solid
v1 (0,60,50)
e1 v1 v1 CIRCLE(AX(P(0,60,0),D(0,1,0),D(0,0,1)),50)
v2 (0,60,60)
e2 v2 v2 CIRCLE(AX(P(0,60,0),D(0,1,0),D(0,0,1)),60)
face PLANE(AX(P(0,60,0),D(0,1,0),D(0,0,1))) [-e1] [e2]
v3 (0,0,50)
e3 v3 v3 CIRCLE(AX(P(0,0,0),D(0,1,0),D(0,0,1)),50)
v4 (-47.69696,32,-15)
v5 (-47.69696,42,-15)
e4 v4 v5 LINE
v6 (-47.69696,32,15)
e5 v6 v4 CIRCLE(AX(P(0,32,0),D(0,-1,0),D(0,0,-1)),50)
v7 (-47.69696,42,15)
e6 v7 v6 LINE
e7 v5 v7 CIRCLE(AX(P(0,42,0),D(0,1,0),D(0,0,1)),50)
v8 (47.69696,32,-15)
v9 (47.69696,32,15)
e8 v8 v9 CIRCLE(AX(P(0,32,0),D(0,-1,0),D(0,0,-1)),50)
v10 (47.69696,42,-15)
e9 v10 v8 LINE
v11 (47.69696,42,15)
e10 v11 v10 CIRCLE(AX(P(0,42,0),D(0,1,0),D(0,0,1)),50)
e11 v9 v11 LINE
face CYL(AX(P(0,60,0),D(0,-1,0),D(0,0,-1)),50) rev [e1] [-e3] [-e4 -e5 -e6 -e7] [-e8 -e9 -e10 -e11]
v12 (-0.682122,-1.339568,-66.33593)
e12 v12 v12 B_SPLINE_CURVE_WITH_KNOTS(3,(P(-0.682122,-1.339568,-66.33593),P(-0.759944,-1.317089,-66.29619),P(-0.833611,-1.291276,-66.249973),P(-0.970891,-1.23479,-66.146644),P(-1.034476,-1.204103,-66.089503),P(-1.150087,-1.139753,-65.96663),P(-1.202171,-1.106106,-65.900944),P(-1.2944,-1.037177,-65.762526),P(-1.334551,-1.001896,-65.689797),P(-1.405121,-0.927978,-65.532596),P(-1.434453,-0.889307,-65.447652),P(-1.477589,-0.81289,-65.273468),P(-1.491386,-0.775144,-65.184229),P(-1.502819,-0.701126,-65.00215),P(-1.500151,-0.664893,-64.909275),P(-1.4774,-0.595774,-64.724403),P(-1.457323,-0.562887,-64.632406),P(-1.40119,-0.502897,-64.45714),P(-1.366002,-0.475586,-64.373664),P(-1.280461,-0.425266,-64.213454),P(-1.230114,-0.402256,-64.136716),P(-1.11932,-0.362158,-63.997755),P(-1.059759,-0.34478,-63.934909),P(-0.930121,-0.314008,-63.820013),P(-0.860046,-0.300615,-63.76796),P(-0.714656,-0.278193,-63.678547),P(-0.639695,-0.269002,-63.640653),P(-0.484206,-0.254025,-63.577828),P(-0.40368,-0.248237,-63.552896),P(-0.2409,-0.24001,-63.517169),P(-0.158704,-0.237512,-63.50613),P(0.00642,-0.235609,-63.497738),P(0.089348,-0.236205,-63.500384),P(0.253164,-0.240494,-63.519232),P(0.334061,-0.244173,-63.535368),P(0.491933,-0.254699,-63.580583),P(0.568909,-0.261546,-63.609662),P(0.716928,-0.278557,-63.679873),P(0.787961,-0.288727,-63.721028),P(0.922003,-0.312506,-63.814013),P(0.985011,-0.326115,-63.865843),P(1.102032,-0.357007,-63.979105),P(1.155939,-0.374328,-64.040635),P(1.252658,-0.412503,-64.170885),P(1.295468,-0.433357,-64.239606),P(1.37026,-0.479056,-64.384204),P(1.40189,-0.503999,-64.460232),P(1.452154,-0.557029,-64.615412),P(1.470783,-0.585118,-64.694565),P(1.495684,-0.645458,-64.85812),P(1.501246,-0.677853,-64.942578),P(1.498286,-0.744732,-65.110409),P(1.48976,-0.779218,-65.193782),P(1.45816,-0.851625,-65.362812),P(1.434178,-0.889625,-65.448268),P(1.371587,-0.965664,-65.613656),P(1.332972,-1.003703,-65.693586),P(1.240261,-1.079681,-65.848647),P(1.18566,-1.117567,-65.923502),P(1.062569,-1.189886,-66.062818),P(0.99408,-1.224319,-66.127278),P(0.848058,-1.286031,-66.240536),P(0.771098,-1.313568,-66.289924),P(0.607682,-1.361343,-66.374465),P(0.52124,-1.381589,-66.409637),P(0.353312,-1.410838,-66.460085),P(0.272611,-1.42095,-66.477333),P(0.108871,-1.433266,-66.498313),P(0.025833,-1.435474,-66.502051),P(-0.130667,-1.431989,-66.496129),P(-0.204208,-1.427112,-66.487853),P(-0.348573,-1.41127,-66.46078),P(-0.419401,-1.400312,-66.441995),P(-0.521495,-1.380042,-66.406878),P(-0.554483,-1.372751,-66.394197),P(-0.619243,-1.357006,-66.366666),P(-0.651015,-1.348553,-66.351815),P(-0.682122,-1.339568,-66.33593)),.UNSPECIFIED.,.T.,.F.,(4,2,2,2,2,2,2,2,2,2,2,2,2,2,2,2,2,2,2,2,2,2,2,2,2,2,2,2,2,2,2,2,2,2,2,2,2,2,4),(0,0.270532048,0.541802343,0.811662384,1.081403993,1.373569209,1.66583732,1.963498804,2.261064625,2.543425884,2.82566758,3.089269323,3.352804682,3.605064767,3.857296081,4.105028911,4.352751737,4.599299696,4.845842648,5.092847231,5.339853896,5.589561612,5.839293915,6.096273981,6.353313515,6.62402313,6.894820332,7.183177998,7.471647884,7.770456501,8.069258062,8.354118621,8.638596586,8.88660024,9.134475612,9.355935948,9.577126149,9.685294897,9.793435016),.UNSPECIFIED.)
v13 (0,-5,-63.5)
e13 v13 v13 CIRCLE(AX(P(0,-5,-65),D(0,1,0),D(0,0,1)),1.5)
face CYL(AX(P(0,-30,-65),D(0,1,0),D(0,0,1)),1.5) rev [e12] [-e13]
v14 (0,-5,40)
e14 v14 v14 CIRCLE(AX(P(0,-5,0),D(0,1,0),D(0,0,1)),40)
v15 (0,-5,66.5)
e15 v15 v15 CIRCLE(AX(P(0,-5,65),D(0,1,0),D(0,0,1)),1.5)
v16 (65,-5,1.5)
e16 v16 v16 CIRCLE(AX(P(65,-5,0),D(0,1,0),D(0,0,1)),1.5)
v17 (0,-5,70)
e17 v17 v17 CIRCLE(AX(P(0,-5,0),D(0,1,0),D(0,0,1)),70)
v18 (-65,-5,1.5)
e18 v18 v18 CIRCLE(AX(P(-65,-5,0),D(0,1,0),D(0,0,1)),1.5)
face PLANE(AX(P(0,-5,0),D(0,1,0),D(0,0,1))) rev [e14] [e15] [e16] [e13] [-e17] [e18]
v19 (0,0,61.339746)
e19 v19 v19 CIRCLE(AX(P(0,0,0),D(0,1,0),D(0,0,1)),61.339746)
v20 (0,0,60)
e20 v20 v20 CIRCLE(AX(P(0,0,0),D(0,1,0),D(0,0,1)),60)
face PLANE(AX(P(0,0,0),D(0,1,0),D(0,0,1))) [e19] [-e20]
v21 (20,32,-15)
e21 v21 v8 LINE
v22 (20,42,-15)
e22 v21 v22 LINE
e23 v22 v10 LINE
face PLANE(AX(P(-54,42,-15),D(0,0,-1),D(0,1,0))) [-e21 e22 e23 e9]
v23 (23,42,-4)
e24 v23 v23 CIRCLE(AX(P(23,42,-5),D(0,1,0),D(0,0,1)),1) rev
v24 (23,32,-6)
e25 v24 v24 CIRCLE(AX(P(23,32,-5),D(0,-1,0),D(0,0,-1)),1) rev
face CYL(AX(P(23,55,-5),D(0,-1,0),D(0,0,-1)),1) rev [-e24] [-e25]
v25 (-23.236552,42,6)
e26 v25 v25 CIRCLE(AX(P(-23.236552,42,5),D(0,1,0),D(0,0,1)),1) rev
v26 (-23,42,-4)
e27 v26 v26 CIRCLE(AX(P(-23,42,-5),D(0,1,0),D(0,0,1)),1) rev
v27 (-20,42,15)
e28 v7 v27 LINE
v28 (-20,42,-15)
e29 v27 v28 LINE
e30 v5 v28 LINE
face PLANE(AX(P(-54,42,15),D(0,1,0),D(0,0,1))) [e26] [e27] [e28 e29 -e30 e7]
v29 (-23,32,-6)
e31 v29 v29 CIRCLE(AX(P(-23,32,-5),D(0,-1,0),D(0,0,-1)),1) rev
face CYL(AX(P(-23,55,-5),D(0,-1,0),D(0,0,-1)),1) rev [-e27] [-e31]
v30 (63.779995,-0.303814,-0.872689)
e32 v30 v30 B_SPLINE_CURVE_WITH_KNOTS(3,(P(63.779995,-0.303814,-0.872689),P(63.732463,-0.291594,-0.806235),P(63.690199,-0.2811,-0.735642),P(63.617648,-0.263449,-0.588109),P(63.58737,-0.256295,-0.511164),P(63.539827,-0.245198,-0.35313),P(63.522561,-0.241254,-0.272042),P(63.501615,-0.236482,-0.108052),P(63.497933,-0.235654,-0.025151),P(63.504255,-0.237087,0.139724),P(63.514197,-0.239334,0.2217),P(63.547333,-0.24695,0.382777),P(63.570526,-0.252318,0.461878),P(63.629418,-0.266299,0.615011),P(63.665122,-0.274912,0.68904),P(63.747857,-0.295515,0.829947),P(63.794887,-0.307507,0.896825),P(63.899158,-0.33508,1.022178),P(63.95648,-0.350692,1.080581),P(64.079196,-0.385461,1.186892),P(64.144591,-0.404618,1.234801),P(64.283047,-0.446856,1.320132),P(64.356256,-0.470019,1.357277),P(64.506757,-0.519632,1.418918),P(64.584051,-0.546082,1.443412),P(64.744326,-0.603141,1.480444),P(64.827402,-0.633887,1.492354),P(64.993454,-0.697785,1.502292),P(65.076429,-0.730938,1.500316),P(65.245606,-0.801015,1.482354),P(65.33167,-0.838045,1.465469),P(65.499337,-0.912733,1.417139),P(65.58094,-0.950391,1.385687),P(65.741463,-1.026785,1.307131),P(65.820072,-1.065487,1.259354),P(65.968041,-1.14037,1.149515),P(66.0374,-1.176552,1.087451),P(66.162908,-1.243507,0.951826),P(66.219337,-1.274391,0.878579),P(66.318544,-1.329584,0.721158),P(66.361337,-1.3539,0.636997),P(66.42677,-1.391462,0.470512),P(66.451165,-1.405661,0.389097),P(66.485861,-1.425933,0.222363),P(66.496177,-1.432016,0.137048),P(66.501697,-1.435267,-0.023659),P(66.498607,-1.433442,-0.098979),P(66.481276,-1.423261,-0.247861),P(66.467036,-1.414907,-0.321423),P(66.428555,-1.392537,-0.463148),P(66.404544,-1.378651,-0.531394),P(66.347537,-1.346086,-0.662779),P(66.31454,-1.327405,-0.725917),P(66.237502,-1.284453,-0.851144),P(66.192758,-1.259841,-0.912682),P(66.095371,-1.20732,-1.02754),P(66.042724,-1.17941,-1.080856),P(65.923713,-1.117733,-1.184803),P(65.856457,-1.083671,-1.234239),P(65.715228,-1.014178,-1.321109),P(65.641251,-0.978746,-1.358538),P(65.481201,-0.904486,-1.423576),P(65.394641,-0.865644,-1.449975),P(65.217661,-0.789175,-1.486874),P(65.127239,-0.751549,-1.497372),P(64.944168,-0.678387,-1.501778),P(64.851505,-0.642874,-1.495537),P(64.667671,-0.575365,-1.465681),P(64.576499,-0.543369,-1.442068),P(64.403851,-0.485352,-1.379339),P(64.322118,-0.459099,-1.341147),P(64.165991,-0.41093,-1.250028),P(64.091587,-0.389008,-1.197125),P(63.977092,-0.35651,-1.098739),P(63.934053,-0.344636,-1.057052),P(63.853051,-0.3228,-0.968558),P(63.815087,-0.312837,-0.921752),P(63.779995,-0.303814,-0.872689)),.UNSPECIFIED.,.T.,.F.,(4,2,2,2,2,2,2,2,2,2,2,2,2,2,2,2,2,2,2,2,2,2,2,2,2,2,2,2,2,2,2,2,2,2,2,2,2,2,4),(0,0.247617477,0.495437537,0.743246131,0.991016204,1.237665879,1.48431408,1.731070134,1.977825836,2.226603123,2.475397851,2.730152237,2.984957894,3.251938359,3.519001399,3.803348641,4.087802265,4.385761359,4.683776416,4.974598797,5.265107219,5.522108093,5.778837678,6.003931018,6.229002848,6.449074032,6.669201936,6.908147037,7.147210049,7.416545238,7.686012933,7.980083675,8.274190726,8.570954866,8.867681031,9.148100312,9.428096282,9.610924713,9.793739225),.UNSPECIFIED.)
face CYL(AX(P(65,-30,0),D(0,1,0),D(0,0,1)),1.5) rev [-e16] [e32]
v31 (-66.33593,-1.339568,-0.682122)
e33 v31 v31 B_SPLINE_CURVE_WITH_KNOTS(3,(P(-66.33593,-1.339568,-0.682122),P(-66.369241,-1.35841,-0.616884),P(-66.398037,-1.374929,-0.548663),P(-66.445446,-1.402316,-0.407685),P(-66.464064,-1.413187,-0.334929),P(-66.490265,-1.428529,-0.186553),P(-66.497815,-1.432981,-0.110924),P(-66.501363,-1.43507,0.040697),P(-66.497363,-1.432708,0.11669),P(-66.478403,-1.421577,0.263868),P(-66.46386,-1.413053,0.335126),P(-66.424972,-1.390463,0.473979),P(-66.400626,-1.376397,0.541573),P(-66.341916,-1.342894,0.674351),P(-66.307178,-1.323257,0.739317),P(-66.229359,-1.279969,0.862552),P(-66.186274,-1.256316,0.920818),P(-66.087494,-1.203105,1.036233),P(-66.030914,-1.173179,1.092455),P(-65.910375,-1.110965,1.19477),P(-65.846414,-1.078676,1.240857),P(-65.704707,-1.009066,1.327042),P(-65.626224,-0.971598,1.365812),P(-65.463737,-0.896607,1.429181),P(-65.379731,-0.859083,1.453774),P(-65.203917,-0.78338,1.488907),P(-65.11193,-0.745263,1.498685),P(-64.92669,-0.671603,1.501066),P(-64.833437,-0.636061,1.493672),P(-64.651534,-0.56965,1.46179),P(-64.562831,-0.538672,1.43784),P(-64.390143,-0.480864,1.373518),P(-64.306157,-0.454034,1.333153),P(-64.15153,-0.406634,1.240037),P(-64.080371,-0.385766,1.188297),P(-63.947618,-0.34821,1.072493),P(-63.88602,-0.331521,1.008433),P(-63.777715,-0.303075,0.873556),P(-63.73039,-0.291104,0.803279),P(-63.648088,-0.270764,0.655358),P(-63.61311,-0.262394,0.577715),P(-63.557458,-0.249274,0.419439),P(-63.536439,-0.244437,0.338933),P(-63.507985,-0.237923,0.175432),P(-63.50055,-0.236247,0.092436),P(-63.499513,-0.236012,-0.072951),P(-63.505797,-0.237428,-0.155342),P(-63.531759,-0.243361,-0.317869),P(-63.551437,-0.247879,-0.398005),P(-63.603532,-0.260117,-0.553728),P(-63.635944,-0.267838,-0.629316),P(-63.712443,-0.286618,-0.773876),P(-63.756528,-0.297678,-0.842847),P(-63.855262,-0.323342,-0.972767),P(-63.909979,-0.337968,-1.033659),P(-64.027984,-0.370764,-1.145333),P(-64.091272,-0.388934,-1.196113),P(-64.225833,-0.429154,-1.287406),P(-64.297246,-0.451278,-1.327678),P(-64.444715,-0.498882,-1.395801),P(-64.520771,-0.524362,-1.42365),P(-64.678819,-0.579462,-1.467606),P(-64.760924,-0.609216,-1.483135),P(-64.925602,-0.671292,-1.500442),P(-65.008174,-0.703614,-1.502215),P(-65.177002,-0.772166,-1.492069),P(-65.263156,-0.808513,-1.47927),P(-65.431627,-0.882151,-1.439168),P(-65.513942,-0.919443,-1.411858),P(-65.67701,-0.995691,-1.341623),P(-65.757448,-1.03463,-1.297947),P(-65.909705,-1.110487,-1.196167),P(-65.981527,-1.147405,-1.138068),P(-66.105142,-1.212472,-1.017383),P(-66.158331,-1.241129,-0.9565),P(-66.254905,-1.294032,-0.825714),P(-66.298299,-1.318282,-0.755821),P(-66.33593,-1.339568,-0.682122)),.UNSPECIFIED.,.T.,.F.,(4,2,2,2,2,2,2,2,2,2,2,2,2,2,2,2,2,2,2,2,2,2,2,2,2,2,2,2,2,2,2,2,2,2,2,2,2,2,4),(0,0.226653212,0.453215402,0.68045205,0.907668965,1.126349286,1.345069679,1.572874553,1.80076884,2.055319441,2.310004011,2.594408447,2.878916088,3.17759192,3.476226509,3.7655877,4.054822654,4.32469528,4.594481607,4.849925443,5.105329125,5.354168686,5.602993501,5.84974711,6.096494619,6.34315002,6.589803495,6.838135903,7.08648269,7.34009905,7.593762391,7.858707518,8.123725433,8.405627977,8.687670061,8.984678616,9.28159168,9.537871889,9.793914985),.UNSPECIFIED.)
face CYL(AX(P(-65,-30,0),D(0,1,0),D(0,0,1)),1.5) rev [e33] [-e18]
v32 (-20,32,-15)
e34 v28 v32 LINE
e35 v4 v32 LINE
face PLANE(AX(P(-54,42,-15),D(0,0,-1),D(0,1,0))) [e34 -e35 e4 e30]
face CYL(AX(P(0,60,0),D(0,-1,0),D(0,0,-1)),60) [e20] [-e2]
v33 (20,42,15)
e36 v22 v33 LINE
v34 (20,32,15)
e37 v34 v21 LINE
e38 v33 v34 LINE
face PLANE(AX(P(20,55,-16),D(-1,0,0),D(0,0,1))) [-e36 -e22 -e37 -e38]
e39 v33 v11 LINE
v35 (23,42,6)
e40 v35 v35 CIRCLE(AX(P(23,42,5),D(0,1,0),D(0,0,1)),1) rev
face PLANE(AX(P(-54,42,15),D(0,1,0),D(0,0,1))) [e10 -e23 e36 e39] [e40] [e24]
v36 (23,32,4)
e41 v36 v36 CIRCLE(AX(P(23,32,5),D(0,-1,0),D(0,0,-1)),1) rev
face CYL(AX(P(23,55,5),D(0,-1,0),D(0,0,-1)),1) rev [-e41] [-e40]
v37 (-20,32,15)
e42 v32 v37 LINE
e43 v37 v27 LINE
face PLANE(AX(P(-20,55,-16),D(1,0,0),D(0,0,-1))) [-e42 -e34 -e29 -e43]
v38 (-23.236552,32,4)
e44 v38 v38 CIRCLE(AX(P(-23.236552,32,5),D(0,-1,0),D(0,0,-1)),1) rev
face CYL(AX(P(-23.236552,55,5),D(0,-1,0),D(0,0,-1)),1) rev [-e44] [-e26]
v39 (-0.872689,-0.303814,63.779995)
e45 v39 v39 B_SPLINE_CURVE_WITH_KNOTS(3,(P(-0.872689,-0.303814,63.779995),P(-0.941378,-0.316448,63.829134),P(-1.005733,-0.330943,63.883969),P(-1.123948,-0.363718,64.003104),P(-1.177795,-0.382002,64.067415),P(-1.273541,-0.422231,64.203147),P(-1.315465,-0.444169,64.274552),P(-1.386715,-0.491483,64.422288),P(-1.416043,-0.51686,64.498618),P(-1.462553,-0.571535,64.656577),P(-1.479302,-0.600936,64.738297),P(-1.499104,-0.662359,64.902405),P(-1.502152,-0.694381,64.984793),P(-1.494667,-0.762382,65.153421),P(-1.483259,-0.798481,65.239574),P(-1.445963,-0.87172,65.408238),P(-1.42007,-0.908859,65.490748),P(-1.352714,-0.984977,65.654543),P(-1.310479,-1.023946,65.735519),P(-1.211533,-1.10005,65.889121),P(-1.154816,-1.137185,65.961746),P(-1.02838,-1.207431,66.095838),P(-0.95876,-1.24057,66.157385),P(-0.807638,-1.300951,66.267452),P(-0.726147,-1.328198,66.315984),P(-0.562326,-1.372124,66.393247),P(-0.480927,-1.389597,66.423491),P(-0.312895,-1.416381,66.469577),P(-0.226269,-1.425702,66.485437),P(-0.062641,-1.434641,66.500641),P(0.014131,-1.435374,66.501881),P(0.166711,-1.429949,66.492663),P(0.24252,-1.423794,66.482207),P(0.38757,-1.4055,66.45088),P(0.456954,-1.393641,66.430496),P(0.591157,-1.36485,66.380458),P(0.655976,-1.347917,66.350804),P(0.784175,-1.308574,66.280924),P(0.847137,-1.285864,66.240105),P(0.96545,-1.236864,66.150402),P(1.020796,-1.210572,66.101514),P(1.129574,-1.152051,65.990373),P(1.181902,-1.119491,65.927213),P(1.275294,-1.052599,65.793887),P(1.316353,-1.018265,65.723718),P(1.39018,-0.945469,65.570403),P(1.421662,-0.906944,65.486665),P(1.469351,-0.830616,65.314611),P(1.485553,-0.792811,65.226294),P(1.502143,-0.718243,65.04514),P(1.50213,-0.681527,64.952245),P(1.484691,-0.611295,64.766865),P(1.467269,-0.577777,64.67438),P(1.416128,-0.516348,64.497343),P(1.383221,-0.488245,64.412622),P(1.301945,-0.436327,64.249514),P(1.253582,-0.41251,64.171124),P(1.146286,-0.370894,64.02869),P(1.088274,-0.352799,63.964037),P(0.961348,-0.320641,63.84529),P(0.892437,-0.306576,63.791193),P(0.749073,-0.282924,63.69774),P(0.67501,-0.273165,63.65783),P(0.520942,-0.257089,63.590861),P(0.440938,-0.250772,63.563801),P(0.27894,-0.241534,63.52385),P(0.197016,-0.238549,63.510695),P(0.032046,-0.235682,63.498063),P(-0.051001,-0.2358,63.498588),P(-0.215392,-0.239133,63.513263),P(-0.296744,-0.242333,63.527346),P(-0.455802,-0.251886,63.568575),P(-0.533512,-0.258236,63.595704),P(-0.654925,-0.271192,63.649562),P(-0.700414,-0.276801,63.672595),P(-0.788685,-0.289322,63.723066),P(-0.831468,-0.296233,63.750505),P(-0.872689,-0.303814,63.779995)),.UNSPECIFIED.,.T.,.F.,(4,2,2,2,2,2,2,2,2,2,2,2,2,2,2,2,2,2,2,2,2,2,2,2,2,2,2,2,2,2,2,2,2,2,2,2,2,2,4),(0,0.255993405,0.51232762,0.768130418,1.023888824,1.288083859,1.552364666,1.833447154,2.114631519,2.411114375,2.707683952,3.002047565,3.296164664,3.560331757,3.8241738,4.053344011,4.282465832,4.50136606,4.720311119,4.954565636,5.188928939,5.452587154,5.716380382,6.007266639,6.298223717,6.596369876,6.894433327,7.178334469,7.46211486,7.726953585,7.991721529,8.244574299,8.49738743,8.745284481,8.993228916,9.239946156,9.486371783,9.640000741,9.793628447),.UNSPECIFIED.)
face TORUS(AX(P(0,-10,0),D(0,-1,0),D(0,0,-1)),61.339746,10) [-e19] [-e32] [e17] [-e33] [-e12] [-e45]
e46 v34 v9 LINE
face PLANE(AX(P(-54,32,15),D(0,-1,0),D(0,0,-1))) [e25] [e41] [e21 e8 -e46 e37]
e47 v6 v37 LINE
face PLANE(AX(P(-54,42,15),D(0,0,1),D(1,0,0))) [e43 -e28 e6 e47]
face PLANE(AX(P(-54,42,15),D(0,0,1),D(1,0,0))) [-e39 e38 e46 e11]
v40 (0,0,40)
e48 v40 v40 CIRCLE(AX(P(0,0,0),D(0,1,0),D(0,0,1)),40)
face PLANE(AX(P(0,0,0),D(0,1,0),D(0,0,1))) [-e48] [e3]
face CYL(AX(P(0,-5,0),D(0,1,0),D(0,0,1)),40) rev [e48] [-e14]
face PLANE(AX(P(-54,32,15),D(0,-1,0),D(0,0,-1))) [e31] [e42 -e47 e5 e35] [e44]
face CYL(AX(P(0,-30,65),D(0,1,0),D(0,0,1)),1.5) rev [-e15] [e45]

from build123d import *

# Parameters (mm, degrees)
SKETCH1_R                = 60
BOSS_EXTRUDE1_DEPTH      = 60
SHELL1_T                 = -10
SKETCH2_R                = 70
BOSS_EXTRUDE2_DEPTH      = 5
SKETCH5_R                = 40
CUT_EXTRUDE4_DEPTH       = 5
FILLET1_R                = 10
BOSS_EXTRUDE4_DEPTH      = 55
BOSS_EXTRUDE4_DEPTH_BACK = 54
SKETCH7_W                = 30
SKETCH7_H                = 10
SKETCH8_W                = 40
SKETCH8_H                = 32
CUT_EXTRUDE6_DEPTH       = 55
SKETCH9_R                = 1
CUT_EXTRUDE7_DEPTH       = 55
SKETCH10_R               = 1.5
CUT_EXTRUDE8_DEPTH       = 30


with BuildPart() as part:
    # Sketch1 → Boss-Extrude1 (new body)
    with BuildSketch(Plane(origin=(0, 0, 0), x_dir=(1, 0, 0), z_dir=(0, 1, 0))):
        with Locations(Location((0, 0, 0), (0, 0, 270))):
            Circle(SKETCH1_R)
    extrude(amount=BOSS_EXTRUDE1_DEPTH)

    # Shell1
    shell1_openings = [part.faces().sort_by_distance(p)[0] for p in [
        (0, 60, 0),
        (0, 0, 0),
    ]]
    offset(amount=SHELL1_T, openings=shell1_openings, kind=Kind.INTERSECTION)

    # Sketch2 → Boss-Extrude2 (add)
    with BuildSketch(Plane(origin=(0, 0, 0), x_dir=(1, 0, 0), z_dir=(0, 1, 0))):
        with Locations(Location((0, 0, 0), (0, 0, 270))):
            Circle(SKETCH2_R)
    extrude(amount=-BOSS_EXTRUDE2_DEPTH)

    # Sketch5 → Cut-Extrude4 (cut)
    with BuildSketch(Plane(origin=(0, 0, 0), x_dir=(1, 0, 0), z_dir=(0, 1, 0))):
        with Locations(Location((0, 0, 0), (0, 0, 270))):
            Circle(SKETCH5_R)
    extrude(amount=-CUT_EXTRUDE4_DEPTH, mode=Mode.SUBTRACT)

    # Fillet1
    # the kernel refuses this fillet: 10 mm, written as the material it takes off along each edge
    with BuildSketch(Plane(origin=(0, 0, 0), x_dir=(0, 0, 1), z_dir=(-1, 0, 0))) as fillet1_piece_1:
        with BuildLine():
            CenterArc((61.339745962, -10), FILLET1_R, 30, 60)
            Line((61.339745962, 0), (61.339745962, 0.2))
            Line((61.339745962, 0.2), (70, 0.2))
            Line((70, 0.2), (70.2, 0))
            ThreePointArc((70.2, 0), (70.2, -2.5), (70.173205081, -4.9))
            Line((70.173205081, -4.9), (70, -5))
        make_face()
    revolve(axis=Axis((0, 0, 0), (0, 1, 0)), mode=Mode.SUBTRACT)

    # Sketch7 → Boss-Extrude4 (add, two sides: drawn at the far end of the back side and taken through both)
    with BuildSketch(Plane(origin=(0, 0, 0), x_dir=(0, 0, -1), z_dir=(1, 0, 0)).offset(-BOSS_EXTRUDE4_DEPTH_BACK)):
        with Locations((0, 37)):
            Rectangle(SKETCH7_W, SKETCH7_H)
    extrude(amount=BOSS_EXTRUDE4_DEPTH + BOSS_EXTRUDE4_DEPTH_BACK)

    # Sketch8 → Cut-Extrude6 (cut)
    with BuildSketch(Plane(origin=(0, 0, 0), x_dir=(1, 0, 0), z_dir=(0, 1, 0))):
        Rectangle(SKETCH8_W, SKETCH8_H)
    extrude(amount=CUT_EXTRUDE6_DEPTH, mode=Mode.SUBTRACT)

    # Sketch9 → Cut-Extrude7 (cut)
    with BuildSketch(Plane(origin=(0, 0, 0), x_dir=(1, 0, 0), z_dir=(0, 1, 0))):
        with Locations(Location((-23, 5, 0), (0, 0, 90))):
            Circle(SKETCH9_R)
        with Locations(Location((-23.236551587, -5, 0), (0, 0, 90))):
            Circle(SKETCH9_R)
        with Locations(Location((23, 5, 0), (0, 0, 90))):
            Circle(SKETCH9_R)
        with Locations(Location((23, -5, 0), (0, 0, 90))):
            Circle(SKETCH9_R)
    extrude(amount=CUT_EXTRUDE7_DEPTH, mode=Mode.SUBTRACT)

    # Sketch10 → Cut-Extrude8 (cut)
    with BuildSketch(Plane(origin=(0, 0, 0), x_dir=(1, 0, 0), z_dir=(0, 1, 0))):
        with Locations(Location((0, 65, 0), (0, 0, 270))):
            Circle(SKETCH10_R)
        with Locations(Location((65, 0, 0), (0, 0, 270))):
            Circle(SKETCH10_R)
        with Locations(Location((0, -65, 0), (0, 0, 270))):
            Circle(SKETCH10_R)
        with Locations(Location((-65, 0, 0), (0, 0, 270))):
            Circle(SKETCH10_R)
    extrude(amount=-CUT_EXTRUDE8_DEPTH, mode=Mode.SUBTRACT)


solid = part.part
